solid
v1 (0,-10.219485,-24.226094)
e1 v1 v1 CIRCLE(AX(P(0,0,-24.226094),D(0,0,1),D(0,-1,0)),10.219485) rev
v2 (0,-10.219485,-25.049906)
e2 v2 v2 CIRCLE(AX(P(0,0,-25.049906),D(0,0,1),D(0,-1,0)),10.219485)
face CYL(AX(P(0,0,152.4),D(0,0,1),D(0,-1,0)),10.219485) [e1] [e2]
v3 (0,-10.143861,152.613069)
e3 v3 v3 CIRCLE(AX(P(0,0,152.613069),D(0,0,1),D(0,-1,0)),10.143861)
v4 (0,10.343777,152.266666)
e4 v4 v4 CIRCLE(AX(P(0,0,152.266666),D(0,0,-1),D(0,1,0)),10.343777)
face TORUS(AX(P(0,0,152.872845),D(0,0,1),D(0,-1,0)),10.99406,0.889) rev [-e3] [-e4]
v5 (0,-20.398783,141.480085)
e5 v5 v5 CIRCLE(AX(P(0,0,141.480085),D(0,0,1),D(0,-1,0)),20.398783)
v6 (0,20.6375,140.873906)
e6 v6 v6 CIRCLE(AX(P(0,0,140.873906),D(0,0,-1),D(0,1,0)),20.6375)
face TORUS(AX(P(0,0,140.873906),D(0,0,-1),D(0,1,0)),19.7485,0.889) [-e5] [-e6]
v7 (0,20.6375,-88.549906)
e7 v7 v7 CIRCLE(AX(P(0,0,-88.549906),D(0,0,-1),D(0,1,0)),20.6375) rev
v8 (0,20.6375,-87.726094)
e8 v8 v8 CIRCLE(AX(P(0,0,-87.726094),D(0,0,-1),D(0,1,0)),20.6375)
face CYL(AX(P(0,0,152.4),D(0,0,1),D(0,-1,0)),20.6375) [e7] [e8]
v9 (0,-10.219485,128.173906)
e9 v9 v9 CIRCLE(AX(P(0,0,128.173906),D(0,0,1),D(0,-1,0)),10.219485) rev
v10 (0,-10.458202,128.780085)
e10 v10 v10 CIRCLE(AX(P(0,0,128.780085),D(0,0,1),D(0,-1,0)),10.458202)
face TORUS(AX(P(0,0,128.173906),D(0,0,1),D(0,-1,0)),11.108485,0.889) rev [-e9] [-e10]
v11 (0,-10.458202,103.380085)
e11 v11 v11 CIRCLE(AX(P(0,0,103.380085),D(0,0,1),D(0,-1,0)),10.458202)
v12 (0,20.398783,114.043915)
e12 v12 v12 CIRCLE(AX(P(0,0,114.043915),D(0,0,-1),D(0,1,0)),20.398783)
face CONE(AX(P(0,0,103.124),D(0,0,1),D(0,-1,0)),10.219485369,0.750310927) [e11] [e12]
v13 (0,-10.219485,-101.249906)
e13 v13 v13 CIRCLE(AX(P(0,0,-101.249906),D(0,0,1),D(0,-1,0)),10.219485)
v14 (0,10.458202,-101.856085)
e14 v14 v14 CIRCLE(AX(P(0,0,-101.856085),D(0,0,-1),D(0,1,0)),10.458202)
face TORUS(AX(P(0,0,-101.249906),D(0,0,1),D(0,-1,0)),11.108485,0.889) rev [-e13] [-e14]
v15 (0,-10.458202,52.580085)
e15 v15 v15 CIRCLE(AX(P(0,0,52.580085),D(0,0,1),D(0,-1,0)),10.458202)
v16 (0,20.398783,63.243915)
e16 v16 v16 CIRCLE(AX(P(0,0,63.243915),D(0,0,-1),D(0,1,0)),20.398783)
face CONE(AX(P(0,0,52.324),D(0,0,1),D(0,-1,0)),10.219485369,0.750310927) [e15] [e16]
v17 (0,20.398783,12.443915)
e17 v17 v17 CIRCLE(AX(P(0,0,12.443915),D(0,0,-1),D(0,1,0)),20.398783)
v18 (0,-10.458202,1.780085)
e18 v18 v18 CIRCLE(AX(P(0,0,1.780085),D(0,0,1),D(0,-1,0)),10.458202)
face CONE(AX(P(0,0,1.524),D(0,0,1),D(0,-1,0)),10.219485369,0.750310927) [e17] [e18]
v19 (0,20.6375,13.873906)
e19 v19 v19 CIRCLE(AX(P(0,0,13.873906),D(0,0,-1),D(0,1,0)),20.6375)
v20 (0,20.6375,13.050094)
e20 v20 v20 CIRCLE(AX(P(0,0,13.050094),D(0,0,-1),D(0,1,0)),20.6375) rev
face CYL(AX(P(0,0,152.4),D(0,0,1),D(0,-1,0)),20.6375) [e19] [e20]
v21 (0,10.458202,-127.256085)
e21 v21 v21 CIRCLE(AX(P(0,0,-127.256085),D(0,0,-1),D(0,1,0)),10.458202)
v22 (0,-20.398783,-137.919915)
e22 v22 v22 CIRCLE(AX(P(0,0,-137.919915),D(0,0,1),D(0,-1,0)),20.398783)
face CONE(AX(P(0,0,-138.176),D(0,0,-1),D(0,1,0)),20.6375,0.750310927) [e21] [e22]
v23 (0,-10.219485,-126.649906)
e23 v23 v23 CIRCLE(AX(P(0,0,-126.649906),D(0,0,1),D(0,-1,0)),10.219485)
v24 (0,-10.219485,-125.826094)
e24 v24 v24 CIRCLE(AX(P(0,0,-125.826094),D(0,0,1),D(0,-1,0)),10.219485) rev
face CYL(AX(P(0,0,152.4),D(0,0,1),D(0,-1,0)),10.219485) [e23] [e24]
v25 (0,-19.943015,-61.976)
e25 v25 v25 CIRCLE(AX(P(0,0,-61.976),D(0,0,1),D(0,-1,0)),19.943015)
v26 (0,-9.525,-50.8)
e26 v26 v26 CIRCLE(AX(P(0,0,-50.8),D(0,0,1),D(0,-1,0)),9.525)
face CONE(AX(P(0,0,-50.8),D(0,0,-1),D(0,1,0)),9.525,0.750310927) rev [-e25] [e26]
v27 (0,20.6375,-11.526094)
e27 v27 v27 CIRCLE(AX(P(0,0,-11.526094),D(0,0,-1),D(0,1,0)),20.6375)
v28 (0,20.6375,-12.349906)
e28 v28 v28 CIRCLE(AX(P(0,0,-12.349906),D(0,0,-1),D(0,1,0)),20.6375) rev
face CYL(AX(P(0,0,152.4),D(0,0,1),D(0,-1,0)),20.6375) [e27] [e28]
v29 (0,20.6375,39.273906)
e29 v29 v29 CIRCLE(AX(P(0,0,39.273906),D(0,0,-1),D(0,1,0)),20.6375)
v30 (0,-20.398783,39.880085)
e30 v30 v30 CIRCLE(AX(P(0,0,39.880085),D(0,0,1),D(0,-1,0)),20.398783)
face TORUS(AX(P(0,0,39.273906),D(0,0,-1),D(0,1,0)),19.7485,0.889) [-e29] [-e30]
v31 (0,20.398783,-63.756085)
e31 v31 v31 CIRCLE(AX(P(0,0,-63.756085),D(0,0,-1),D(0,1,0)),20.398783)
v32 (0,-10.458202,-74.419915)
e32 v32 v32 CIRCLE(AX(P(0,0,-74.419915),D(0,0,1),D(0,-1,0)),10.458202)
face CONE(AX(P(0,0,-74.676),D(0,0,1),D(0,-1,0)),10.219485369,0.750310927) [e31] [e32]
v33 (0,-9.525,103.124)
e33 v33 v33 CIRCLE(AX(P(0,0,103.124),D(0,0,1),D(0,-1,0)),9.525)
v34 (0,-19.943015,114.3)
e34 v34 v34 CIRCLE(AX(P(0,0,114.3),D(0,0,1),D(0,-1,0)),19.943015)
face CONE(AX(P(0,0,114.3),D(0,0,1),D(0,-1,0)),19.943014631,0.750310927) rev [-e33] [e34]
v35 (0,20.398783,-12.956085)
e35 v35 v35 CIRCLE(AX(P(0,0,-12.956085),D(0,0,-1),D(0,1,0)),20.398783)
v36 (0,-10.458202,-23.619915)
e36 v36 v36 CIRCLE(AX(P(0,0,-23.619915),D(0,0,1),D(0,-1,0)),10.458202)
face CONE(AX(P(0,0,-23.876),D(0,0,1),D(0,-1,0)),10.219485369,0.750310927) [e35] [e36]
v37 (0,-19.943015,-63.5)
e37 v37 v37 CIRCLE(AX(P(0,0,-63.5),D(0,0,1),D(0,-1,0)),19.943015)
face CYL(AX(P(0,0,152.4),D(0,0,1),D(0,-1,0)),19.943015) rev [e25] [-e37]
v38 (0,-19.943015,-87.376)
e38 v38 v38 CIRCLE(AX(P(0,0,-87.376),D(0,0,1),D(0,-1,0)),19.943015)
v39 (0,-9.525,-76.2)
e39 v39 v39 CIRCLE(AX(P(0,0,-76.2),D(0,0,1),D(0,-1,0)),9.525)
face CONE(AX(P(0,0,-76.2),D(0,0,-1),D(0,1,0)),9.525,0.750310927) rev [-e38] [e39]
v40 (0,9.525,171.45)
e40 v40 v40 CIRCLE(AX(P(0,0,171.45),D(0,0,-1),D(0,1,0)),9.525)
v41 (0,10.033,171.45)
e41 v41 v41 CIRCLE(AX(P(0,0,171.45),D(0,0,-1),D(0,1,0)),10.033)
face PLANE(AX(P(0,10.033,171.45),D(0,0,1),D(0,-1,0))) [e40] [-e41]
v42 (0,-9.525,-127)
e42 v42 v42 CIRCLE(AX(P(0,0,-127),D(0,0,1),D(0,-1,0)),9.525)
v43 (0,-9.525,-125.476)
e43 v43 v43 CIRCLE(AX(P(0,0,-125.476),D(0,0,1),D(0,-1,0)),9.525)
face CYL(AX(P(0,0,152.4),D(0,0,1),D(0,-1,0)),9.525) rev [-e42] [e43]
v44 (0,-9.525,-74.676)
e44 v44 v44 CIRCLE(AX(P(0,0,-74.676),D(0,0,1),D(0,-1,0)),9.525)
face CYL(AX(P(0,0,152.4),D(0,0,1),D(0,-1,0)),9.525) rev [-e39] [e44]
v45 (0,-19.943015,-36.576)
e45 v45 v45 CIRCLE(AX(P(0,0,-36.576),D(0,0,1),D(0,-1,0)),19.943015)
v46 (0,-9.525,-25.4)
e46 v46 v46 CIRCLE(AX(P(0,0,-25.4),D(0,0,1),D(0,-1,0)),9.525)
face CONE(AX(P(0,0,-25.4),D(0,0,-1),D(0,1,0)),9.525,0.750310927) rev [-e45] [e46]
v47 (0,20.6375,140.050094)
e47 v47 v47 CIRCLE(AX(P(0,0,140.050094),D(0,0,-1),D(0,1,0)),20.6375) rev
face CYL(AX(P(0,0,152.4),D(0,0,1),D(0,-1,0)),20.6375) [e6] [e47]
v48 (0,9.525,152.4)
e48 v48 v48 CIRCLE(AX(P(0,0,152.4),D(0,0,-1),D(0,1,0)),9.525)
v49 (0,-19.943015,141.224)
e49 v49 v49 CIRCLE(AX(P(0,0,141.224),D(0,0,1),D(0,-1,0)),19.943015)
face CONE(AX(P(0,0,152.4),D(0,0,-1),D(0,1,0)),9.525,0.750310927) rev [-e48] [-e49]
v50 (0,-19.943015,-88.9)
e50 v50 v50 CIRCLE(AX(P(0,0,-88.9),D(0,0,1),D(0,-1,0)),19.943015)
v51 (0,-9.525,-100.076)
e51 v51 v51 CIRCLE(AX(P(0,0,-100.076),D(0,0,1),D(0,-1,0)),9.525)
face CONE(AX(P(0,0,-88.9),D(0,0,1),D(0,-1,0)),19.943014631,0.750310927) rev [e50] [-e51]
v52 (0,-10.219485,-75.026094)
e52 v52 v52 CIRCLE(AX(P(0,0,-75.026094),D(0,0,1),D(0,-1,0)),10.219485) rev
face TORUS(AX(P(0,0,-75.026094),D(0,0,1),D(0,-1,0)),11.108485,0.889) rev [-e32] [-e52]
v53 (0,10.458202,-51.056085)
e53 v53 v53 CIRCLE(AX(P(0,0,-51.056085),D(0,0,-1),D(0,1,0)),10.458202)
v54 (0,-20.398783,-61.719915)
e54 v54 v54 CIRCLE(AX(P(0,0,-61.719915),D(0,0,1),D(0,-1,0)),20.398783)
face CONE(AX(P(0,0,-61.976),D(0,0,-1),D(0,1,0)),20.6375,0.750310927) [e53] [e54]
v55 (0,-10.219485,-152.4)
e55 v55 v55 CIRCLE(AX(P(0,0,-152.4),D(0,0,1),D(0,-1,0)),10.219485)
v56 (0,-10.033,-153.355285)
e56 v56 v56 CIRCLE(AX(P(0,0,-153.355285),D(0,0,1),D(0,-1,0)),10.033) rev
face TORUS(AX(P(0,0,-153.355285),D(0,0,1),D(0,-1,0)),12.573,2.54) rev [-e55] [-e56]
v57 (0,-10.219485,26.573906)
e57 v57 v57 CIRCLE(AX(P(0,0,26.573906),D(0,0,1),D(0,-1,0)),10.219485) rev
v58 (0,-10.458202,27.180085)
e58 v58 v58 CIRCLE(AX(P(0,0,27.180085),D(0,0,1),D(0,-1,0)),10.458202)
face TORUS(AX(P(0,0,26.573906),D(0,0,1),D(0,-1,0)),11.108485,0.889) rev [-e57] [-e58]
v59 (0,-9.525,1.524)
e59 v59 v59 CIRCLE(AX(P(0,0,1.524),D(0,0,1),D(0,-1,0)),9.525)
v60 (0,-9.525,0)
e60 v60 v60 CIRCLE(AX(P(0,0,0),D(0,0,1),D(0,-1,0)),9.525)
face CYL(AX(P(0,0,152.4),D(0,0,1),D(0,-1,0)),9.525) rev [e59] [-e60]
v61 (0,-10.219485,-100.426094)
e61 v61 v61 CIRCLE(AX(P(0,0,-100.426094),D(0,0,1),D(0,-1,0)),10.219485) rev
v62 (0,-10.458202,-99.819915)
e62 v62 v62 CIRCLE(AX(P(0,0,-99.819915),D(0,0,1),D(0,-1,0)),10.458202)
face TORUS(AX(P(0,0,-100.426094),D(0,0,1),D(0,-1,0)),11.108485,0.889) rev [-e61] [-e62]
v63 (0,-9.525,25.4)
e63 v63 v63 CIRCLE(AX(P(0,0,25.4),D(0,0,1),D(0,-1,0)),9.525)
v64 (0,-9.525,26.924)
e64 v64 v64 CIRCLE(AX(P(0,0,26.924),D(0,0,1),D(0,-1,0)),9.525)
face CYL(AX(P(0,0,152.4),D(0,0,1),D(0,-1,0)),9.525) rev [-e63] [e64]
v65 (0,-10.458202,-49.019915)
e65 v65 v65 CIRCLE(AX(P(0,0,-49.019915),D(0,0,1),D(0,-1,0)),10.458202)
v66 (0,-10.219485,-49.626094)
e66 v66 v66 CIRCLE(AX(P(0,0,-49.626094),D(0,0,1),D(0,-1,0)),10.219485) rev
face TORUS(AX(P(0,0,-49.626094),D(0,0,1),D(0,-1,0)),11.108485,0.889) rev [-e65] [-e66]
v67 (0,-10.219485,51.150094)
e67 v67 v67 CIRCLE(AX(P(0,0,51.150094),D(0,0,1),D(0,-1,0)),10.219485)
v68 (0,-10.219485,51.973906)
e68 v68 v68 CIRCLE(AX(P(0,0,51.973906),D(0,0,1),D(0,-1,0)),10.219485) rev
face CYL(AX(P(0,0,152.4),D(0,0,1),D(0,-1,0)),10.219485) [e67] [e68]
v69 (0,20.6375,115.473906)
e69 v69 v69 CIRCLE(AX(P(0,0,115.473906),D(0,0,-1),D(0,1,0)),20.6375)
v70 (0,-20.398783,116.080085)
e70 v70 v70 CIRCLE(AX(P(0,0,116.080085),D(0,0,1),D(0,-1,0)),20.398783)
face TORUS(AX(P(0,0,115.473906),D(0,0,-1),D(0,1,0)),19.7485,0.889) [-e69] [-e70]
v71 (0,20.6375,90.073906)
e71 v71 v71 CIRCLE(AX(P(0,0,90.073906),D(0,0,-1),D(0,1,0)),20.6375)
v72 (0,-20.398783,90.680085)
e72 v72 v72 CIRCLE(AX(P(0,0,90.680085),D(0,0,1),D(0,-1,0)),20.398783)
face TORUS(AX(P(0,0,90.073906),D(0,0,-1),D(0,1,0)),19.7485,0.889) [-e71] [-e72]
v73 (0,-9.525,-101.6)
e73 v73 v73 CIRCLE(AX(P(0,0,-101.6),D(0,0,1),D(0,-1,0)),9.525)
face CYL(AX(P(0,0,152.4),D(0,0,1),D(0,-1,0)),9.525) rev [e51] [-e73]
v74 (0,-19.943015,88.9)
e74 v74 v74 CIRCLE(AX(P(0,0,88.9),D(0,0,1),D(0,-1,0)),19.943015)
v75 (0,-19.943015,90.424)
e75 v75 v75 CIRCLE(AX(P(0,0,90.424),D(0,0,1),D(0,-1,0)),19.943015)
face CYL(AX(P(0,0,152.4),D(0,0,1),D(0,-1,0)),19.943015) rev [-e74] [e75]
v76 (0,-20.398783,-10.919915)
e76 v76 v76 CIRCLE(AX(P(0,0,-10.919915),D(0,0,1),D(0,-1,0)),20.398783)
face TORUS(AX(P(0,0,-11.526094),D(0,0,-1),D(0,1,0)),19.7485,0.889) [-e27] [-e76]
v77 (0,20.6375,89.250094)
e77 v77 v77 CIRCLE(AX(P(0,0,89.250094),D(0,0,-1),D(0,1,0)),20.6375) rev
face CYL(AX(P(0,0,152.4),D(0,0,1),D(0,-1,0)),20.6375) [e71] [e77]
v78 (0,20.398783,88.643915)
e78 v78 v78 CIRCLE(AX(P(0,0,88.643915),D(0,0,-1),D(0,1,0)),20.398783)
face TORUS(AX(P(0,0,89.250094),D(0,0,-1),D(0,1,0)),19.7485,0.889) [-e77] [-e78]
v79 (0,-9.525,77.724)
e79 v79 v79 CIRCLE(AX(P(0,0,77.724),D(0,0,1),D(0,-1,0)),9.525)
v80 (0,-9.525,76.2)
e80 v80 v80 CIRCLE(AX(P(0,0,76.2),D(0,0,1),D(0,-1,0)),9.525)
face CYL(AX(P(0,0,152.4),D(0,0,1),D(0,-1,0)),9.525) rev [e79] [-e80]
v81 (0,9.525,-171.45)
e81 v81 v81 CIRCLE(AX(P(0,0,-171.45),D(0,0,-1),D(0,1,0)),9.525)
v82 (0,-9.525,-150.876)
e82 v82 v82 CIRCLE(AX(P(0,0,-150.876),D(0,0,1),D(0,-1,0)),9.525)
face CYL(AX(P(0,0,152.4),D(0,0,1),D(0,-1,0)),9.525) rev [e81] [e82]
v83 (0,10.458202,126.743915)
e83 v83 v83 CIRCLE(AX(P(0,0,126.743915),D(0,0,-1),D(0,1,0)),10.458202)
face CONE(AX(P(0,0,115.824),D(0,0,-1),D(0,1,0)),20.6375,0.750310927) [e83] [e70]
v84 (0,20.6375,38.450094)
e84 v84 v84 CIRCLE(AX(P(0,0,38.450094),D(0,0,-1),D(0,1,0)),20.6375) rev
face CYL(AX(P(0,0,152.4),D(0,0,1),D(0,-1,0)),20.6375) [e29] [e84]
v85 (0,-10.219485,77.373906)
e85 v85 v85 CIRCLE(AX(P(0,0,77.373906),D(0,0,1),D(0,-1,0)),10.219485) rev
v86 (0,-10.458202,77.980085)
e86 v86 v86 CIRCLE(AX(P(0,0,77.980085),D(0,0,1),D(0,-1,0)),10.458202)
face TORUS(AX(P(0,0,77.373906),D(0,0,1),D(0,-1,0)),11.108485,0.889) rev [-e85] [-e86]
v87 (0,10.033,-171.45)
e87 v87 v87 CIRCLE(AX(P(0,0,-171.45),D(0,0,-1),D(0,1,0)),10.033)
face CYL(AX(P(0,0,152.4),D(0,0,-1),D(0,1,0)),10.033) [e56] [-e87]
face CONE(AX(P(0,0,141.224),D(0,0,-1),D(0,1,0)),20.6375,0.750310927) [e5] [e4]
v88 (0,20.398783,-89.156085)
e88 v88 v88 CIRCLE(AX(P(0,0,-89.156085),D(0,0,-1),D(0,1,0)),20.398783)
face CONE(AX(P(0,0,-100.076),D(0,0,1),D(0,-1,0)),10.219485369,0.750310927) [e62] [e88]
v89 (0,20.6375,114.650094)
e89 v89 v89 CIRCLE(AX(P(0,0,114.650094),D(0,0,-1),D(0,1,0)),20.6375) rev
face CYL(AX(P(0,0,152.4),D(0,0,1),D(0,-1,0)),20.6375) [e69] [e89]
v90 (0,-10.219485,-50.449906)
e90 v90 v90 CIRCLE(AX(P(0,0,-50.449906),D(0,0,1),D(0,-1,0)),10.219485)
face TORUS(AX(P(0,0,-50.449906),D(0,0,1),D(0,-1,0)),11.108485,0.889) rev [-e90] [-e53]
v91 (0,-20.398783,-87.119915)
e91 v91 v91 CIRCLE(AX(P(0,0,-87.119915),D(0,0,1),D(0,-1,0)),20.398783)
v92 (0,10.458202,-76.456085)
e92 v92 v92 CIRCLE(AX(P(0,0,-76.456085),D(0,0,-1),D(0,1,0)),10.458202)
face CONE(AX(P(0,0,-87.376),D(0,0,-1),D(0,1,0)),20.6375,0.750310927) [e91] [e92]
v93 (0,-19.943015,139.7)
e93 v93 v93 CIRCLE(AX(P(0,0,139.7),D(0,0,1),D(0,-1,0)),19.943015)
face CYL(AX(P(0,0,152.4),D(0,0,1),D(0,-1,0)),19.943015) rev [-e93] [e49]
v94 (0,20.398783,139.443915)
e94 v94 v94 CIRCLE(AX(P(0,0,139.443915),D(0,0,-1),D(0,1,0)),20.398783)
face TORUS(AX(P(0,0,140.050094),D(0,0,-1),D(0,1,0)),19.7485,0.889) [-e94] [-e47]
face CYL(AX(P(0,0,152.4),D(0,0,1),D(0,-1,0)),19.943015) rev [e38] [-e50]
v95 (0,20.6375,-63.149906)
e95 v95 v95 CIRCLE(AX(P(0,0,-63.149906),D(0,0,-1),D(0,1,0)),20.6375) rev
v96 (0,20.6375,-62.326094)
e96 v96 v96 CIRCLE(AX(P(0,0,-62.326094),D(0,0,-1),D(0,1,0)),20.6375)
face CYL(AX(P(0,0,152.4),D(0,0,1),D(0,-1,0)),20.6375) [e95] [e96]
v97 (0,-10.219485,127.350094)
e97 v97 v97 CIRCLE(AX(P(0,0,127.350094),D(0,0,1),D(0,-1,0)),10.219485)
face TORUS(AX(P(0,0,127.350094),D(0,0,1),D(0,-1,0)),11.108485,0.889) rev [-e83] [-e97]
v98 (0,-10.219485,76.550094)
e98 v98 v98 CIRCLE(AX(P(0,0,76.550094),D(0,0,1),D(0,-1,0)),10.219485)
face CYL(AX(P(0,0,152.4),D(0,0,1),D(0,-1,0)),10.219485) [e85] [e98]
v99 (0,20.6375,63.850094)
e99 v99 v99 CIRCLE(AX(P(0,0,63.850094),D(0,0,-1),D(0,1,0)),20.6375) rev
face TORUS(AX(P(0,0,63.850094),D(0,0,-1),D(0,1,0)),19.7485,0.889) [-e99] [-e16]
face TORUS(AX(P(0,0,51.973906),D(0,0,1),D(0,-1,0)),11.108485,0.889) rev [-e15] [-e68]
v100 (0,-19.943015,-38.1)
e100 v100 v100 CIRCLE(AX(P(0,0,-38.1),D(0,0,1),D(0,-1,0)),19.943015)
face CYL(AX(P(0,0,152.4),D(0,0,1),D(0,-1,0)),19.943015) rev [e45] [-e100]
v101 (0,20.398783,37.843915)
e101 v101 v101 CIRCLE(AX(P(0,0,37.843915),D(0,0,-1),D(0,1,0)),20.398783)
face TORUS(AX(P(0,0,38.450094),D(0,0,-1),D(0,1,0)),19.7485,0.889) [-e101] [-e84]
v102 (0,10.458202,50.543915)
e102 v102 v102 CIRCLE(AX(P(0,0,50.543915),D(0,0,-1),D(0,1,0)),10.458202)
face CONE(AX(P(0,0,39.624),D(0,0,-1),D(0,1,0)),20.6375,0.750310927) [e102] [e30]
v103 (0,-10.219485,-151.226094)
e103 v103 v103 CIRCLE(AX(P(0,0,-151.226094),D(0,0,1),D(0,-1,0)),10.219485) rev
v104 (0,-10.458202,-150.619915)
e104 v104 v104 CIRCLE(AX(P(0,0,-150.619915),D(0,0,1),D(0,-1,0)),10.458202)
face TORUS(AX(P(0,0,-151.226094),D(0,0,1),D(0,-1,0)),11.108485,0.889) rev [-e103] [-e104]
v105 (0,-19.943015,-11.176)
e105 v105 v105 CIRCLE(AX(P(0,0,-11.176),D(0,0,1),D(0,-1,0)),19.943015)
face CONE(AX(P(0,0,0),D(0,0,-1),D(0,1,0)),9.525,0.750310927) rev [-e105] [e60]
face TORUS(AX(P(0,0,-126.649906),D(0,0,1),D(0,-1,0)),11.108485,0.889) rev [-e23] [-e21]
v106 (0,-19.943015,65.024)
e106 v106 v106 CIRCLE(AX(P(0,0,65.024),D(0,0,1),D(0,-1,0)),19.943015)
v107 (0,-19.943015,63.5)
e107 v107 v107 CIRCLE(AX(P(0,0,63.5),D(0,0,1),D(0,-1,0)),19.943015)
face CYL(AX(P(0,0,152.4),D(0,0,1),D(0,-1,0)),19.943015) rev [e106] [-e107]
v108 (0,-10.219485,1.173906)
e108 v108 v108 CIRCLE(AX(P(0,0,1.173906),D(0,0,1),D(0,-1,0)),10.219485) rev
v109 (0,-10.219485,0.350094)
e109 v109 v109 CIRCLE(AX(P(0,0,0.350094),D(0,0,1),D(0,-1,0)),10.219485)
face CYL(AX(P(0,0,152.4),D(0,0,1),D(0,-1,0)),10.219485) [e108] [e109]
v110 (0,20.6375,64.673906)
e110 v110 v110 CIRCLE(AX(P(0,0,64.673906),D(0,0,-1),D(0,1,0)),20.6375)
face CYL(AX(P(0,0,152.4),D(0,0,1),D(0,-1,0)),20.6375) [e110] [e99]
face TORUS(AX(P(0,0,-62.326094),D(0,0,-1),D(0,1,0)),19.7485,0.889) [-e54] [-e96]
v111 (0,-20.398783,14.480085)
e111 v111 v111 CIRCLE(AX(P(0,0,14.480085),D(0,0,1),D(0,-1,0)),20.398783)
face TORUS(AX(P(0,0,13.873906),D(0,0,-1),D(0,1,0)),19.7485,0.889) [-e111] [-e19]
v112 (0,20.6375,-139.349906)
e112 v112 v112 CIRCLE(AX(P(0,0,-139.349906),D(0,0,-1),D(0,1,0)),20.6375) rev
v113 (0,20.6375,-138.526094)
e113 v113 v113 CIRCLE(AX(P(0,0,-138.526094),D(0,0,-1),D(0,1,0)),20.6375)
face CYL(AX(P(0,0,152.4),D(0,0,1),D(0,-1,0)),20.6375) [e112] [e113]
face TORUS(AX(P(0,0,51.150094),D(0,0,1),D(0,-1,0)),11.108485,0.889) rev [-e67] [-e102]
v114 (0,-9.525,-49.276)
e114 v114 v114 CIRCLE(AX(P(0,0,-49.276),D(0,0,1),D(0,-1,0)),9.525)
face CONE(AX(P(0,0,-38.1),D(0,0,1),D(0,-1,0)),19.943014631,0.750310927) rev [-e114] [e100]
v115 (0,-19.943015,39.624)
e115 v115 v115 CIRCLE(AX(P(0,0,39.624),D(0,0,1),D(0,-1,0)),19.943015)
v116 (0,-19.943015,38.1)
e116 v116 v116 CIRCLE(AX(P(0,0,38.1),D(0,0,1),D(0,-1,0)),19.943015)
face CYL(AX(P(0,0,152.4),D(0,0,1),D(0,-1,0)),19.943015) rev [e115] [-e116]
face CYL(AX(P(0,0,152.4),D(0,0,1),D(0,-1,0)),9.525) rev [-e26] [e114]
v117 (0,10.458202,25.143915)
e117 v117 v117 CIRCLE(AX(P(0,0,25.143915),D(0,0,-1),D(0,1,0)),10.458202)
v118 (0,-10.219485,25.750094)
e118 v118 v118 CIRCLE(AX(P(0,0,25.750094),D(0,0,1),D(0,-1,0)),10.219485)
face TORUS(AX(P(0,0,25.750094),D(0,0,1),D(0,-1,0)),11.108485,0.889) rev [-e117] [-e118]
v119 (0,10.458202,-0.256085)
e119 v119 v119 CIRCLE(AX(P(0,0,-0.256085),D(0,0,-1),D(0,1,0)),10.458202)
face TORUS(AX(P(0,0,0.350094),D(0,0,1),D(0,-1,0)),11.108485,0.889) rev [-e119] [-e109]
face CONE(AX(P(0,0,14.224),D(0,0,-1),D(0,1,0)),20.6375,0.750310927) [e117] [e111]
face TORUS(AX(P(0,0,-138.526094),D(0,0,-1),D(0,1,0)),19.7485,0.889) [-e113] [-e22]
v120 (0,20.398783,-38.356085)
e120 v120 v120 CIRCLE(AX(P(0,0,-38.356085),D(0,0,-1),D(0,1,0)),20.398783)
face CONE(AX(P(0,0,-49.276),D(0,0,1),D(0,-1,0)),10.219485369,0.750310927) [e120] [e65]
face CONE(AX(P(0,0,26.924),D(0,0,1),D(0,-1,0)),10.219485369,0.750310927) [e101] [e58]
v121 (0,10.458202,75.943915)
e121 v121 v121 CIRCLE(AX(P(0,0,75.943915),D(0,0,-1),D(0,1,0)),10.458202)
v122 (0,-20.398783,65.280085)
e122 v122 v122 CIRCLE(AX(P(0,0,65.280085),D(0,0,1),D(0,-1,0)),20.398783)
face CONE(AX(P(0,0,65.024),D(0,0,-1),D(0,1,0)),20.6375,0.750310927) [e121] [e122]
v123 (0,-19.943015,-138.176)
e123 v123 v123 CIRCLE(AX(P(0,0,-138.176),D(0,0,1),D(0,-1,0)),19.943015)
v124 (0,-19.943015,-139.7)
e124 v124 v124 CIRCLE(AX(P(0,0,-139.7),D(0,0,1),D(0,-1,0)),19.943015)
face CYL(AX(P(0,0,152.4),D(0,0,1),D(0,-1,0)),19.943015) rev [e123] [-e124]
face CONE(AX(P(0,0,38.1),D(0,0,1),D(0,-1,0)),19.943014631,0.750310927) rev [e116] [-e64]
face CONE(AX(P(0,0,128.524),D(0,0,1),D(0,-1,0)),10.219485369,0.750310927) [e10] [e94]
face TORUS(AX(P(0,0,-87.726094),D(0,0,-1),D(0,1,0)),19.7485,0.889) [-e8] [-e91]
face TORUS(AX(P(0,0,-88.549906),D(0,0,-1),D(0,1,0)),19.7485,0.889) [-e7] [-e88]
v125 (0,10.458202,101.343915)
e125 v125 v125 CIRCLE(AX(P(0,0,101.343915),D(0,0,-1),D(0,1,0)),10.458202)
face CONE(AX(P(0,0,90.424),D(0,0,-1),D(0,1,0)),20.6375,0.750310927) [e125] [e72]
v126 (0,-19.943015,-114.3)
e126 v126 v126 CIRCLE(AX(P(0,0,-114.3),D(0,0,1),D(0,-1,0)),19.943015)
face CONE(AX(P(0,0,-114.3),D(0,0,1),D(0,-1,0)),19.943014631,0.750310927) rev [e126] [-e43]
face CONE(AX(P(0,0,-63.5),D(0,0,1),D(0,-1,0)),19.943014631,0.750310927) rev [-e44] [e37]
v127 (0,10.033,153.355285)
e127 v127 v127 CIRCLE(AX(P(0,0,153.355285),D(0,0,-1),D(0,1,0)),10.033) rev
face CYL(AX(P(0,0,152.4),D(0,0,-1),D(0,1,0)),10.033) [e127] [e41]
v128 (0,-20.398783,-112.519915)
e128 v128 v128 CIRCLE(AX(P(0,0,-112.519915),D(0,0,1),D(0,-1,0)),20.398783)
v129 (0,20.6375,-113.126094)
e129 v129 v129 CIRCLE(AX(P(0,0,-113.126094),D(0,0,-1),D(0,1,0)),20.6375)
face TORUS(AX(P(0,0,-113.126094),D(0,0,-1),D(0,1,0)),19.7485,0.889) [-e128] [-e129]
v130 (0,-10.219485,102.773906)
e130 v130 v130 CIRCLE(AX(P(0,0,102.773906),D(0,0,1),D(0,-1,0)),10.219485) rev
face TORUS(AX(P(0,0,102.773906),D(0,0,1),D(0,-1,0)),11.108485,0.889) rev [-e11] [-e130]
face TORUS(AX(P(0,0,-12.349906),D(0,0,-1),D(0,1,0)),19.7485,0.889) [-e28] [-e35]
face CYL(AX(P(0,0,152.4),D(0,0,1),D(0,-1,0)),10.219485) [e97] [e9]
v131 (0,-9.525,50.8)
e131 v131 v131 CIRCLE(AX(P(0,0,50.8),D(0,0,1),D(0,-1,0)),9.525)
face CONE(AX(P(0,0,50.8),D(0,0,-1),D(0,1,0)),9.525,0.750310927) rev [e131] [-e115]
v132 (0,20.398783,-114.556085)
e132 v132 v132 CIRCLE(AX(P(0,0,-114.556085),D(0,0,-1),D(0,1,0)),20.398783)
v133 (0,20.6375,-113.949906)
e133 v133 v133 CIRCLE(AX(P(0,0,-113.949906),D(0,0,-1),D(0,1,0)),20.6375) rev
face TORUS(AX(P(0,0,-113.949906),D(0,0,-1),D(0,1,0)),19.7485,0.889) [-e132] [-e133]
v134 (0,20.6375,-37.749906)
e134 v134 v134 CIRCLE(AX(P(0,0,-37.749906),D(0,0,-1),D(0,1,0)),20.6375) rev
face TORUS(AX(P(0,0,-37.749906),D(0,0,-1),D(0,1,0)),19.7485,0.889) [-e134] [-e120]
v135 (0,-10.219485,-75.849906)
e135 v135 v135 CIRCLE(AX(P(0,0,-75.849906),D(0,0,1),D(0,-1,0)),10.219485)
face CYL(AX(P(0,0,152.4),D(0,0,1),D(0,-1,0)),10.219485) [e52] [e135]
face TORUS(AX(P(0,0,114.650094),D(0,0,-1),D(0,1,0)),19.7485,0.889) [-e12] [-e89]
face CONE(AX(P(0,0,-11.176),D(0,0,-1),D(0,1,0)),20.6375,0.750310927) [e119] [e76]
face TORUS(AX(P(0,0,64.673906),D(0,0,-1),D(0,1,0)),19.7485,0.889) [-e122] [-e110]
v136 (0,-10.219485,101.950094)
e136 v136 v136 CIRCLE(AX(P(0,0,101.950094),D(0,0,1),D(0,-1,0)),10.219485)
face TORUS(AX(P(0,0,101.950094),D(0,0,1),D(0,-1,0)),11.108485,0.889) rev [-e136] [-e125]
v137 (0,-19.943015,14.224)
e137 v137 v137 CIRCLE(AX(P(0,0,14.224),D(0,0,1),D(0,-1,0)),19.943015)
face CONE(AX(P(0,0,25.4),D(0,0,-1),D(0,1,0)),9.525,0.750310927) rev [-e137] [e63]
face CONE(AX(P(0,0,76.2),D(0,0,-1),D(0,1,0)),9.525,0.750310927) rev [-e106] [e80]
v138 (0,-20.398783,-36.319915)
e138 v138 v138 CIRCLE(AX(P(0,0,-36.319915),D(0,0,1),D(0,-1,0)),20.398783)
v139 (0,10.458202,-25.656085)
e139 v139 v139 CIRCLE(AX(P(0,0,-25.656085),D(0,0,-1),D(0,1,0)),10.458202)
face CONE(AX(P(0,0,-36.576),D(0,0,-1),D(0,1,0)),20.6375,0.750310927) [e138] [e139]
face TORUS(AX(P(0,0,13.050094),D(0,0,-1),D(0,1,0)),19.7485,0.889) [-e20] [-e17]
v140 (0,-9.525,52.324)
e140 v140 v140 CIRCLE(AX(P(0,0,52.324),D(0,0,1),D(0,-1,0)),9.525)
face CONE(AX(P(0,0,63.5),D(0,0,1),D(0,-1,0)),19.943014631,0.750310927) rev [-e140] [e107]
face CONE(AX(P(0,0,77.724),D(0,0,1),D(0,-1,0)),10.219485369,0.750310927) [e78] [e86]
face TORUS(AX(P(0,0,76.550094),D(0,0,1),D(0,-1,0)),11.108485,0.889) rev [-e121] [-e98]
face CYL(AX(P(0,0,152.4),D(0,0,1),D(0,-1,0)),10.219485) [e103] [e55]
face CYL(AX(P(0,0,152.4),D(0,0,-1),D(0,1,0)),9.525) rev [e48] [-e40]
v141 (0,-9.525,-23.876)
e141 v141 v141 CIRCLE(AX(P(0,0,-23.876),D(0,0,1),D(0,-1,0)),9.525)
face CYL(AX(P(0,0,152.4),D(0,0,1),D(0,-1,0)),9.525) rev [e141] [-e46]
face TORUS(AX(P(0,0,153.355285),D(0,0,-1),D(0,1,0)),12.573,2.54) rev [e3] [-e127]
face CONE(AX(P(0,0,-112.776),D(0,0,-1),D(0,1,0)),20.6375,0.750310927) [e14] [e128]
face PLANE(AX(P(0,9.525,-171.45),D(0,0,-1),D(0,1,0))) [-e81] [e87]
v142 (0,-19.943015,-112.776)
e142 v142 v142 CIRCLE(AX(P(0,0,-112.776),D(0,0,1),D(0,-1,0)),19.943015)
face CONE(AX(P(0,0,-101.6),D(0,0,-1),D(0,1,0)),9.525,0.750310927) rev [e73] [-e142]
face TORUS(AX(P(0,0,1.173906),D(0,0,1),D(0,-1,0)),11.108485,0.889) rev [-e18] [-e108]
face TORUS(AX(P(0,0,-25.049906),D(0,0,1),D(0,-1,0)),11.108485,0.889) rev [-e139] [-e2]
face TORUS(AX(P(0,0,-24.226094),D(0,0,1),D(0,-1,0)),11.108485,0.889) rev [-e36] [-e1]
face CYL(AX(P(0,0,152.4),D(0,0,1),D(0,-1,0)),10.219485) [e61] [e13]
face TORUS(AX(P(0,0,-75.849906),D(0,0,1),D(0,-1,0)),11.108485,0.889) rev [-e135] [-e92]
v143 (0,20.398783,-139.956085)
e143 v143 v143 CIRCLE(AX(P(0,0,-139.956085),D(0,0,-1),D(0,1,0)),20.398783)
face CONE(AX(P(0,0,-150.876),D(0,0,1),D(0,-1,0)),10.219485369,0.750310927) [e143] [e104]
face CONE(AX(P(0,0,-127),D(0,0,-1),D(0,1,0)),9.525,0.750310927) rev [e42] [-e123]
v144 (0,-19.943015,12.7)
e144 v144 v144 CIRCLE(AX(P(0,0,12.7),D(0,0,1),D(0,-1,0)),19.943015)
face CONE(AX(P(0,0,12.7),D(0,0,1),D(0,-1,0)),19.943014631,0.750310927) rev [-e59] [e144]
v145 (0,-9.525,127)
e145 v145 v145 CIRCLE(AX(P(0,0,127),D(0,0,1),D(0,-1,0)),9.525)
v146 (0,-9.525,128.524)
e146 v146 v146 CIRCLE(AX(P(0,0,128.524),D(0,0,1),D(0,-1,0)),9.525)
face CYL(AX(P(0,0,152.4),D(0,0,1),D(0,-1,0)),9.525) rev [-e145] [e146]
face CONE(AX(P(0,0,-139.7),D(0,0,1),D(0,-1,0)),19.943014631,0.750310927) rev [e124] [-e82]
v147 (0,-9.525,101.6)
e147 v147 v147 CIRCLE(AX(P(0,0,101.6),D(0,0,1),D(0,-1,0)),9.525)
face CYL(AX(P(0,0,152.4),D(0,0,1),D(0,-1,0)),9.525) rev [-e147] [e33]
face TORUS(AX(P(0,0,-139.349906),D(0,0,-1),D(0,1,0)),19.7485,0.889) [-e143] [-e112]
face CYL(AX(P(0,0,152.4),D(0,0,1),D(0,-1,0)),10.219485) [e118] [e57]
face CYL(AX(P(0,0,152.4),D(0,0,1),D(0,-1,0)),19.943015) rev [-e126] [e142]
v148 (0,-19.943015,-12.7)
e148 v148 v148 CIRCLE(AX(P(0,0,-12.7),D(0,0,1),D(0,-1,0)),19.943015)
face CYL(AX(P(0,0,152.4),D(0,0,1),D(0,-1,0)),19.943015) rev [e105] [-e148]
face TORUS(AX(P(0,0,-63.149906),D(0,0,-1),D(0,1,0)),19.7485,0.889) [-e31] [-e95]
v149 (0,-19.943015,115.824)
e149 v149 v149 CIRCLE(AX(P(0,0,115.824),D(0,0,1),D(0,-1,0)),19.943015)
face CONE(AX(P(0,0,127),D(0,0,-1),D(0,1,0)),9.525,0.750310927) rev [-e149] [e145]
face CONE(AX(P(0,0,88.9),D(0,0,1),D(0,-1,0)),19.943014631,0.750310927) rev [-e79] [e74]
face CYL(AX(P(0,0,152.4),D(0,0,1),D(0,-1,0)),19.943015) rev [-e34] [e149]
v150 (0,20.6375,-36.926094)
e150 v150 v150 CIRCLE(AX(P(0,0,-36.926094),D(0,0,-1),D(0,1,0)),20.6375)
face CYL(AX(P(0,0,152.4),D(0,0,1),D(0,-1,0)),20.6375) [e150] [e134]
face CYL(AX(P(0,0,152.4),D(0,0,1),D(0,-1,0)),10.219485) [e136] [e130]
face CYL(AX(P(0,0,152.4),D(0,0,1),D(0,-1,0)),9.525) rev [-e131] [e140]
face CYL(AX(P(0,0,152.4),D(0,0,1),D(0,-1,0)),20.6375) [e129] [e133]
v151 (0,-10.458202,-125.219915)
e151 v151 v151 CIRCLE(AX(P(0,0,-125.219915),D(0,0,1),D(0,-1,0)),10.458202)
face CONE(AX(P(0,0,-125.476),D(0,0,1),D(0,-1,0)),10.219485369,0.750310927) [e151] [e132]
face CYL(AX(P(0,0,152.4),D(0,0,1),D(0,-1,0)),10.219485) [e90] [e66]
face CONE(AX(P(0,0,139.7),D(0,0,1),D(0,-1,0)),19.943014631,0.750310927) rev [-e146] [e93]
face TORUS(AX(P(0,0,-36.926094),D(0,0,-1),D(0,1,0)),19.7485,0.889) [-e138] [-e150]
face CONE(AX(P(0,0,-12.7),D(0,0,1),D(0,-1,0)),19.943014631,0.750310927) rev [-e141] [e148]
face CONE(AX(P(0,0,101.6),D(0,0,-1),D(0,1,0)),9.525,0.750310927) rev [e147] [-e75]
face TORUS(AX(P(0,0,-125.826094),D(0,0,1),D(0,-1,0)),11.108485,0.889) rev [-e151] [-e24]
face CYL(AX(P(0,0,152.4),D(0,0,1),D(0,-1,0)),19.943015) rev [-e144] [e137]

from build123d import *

# Parameters (mm, degrees)
SKETCH5_W = 19.05
SKETCH5_H = 0.508
FILLET3_R = 2.54
FILLET1_R = 0.889
FILLET2_R = 0.889


with BuildPart() as part:
    # Sketch2 → Revolve3 (revolve)
    with BuildSketch(Plane(origin=(0, 0, 0), x_dir=(0, 0, -1), z_dir=(1, 0, 0)), mode=Mode.PRIVATE) as revolve3_sk:
        Polygon((-152.4, 10.219485369), (-141.224, 20.6375), (-139.7, 20.6375), (-128.524, 10.219485369), (-127, 10.219485369), (-115.824, 20.6375), (-114.3, 20.6375), (-103.124, 10.219485369), (-101.6, 10.219485369), (-90.424, 20.6375), (-88.9, 20.6375), (-77.724, 10.219485369), (-76.2, 10.219485369), (-65.024, 20.6375), (-63.5, 20.6375), (-52.324, 10.219485369), (-50.8, 10.219485369), (-39.624, 20.6375), (-38.1, 20.6375), (-26.924, 10.219485369), (-25.4, 10.219485369), (-14.224, 20.6375), (-12.7, 20.6375), (-1.524, 10.219485369), (0, 10.219485369), (11.176, 20.6375), (12.7, 20.6375), (23.876, 10.219485369), (25.4, 10.219485369), (36.576, 20.6375), (38.1, 20.6375), (49.276, 10.219485369), (50.8, 10.219485369), (61.976, 20.6375), (63.5, 20.6375), (74.676, 10.219485369), (76.2, 10.219485369), (87.376, 20.6375), (88.9, 20.6375), (100.076, 10.219485369), (101.6, 10.219485369), (112.776, 20.6375), (114.3, 20.6375), (125.476, 10.219485369), (127, 10.219485369), (138.176, 20.6375), (139.7, 20.6375), (150.876, 10.219485369), (152.4, 10.219485369), (152.4, 9.525), (150.876, 9.525), (139.7, 19.943014631), (138.176, 19.943014631), (127, 9.525), (125.476, 9.525), (114.3, 19.943014631), (112.776, 19.943014631), (101.6, 9.525), (100.076, 9.525), (88.9, 19.943014631), (87.376, 19.943014631), (76.2, 9.525), (74.676, 9.525), (63.5, 19.943014631), (61.976, 19.943014631), (50.8, 9.525), (49.276, 9.525), (38.1, 19.943014631), (36.576, 19.943014631), (25.4, 9.525), (23.876, 9.525), (12.7, 19.943014631), (11.176, 19.943014631), (0, 9.525), (-1.524, 9.525), (-12.7, 19.943014631), (-14.224, 19.943014631), (-25.4, 9.525), (-26.924, 9.525), (-38.1, 19.943014631), (-39.624, 19.943014631), (-50.8, 9.525), (-52.324, 9.525), (-63.5, 19.943014631), (-65.024, 19.943014631), (-76.2, 9.525), (-77.724, 9.525), (-88.9, 19.943014631), (-90.424, 19.943014631), (-101.6, 9.525), (-103.124, 9.525), (-114.3, 19.943014631), (-115.824, 19.943014631), (-127, 9.525), (-128.524, 9.525), (-139.7, 19.943014631), (-141.224, 19.943014631), (-152.4, 9.525), align=None)
    revolve(revolve3_sk.sketch.rotate(Axis((0, 0, 152.4), (0, 0, -1)), 180), axis=Axis((0, 0, 152.4), (0, 0, -1)))

    # Sketch5 → Revolve2 (revolve)
    with BuildSketch(Plane(origin=(0, 0, 0), x_dir=(0, 0, -1), z_dir=(1, 0, 0))):
        with Locations((-161.925, 9.779)):
            Rectangle(SKETCH5_W, SKETCH5_H)
        with Locations((161.925, 9.779)):
            Rectangle(SKETCH5_W, SKETCH5_H)
    revolve(axis=Axis((0, 0, 152.4), (0, 0, 1)))

    # Fillet3
    # the kernel refuses this fillet: 2.54 mm, written as the material it adds along each edge
    with BuildSketch(Plane(origin=(0, 0, 152.4), x_dir=(0, 1, 0), z_dir=(1, 0, 0))) as fillet3_piece_1:
        with BuildLine():
            CenterArc((12.573, 0.955284712), FILLET3_R, 180, 22.092089756)
            Line((10.033, 0.955284712), (9.9822, 0.955284712))
            Line((9.9822, 0.955284712), (9.9822, 0))
            Line((9.9822, 0), (10.033, -0.0508))
            ThreePointArc((10.033, -0.0508), (10.126242684, -0.0508), (10.172415076, -0.019105694))
            Line((10.172415076, -0.019105694), (10.219485369, 0))
        make_face()
    revolve(axis=Axis((0, 0, 152.4), (0, 0, 1)))
    with BuildSketch(Plane(origin=(0, 0, -152.4), x_dir=(0, 1, 0), z_dir=(1, 0, 0))) as fillet3_piece_2:
        with BuildLine():
            CenterArc((12.573, -0.955284712), FILLET3_R, 157.907910244, 22.092089756)
            Line((10.033, -0.955284712), (9.9822, -0.955284712))
            Line((9.9822, -0.955284712), (9.9822, 0))
            Line((9.9822, 0), (10.033, 0.0508))
            ThreePointArc((10.033, 0.0508), (10.126242684, 0.0508), (10.172415076, 0.019105694))
            Line((10.172415076, 0.019105694), (10.219485369, 0))
        make_face()
    revolve(axis=Axis((0, 0, -152.4), (0, 0, 1)))

    # Fillet1
    fillet1_edges = [part.edges().sort_by_distance(p)[0] for p in [
        (0, 10.219485369, -150.876),
        (0, 20.6375, -139.7),
        (0, 10.219485369, -125.476),
        (0, 20.6375, -114.3),
        (0, 10.219485369, -100.076),
        (0, 20.6375, -88.9),
        (0, 10.219485369, -74.676),
        (0, 20.6375, -63.5),
        (0, 10.219485369, -49.276),
        (0, 20.6375, -38.1),
        (0, 10.219485369, -23.876),
        (0, 20.6375, -12.7),
        (0, 10.219485369, 1.524),
        (0, 20.6375, 12.7),
        (0, 10.219485369, 26.924),
        (0, 20.6375, 38.1),
        (0, 10.219485369, 52.324),
        (0, 20.6375, 63.5),
        (0, 10.219485369, 77.724),
        (0, 20.6375, 88.9),
        (0, 10.219485369, 103.124),
        (0, 20.6375, 114.3),
        (0, 10.219485369, 128.524),
        (0, 20.6375, 139.7),
    ]]
    fillet(fillet1_edges, radius=FILLET1_R)

    # Fillet2
    fillet2_edges = [part.edges().sort_by_distance(p)[0] for p in [
        (0, 20.6375, -138.176),
        (0, 10.219485369, -127),
        (0, 20.6375, -112.776),
        (0, 10.219485369, -101.6),
        (0, 20.6375, -87.376),
        (0, 10.219485369, -76.2),
        (0, 20.6375, -61.976),
        (0, 10.219485369, -50.8),
        (0, 20.6375, -36.576),
        (0, 10.219485369, -25.4),
        (0, 20.6375, -11.176),
        (0, 10.219485369, 0),
        (0, 20.6375, 14.224),
        (0, 10.219485369, 25.4),
        (0, 20.6375, 39.624),
        (0, 10.219485369, 50.8),
        (0, 20.6375, 65.024),
        (0, 10.219485369, 76.2),
        (0, 20.6375, 90.424),
        (0, 10.219485369, 101.6),
        (0, 20.6375, 115.824),
        (0, 10.219485369, 127),
        (0, 20.6375, 141.224),
        (-10.219485369, 0, 152.4),
    ]]
    fillet(fillet2_edges, radius=FILLET2_R)


solid = part.part
